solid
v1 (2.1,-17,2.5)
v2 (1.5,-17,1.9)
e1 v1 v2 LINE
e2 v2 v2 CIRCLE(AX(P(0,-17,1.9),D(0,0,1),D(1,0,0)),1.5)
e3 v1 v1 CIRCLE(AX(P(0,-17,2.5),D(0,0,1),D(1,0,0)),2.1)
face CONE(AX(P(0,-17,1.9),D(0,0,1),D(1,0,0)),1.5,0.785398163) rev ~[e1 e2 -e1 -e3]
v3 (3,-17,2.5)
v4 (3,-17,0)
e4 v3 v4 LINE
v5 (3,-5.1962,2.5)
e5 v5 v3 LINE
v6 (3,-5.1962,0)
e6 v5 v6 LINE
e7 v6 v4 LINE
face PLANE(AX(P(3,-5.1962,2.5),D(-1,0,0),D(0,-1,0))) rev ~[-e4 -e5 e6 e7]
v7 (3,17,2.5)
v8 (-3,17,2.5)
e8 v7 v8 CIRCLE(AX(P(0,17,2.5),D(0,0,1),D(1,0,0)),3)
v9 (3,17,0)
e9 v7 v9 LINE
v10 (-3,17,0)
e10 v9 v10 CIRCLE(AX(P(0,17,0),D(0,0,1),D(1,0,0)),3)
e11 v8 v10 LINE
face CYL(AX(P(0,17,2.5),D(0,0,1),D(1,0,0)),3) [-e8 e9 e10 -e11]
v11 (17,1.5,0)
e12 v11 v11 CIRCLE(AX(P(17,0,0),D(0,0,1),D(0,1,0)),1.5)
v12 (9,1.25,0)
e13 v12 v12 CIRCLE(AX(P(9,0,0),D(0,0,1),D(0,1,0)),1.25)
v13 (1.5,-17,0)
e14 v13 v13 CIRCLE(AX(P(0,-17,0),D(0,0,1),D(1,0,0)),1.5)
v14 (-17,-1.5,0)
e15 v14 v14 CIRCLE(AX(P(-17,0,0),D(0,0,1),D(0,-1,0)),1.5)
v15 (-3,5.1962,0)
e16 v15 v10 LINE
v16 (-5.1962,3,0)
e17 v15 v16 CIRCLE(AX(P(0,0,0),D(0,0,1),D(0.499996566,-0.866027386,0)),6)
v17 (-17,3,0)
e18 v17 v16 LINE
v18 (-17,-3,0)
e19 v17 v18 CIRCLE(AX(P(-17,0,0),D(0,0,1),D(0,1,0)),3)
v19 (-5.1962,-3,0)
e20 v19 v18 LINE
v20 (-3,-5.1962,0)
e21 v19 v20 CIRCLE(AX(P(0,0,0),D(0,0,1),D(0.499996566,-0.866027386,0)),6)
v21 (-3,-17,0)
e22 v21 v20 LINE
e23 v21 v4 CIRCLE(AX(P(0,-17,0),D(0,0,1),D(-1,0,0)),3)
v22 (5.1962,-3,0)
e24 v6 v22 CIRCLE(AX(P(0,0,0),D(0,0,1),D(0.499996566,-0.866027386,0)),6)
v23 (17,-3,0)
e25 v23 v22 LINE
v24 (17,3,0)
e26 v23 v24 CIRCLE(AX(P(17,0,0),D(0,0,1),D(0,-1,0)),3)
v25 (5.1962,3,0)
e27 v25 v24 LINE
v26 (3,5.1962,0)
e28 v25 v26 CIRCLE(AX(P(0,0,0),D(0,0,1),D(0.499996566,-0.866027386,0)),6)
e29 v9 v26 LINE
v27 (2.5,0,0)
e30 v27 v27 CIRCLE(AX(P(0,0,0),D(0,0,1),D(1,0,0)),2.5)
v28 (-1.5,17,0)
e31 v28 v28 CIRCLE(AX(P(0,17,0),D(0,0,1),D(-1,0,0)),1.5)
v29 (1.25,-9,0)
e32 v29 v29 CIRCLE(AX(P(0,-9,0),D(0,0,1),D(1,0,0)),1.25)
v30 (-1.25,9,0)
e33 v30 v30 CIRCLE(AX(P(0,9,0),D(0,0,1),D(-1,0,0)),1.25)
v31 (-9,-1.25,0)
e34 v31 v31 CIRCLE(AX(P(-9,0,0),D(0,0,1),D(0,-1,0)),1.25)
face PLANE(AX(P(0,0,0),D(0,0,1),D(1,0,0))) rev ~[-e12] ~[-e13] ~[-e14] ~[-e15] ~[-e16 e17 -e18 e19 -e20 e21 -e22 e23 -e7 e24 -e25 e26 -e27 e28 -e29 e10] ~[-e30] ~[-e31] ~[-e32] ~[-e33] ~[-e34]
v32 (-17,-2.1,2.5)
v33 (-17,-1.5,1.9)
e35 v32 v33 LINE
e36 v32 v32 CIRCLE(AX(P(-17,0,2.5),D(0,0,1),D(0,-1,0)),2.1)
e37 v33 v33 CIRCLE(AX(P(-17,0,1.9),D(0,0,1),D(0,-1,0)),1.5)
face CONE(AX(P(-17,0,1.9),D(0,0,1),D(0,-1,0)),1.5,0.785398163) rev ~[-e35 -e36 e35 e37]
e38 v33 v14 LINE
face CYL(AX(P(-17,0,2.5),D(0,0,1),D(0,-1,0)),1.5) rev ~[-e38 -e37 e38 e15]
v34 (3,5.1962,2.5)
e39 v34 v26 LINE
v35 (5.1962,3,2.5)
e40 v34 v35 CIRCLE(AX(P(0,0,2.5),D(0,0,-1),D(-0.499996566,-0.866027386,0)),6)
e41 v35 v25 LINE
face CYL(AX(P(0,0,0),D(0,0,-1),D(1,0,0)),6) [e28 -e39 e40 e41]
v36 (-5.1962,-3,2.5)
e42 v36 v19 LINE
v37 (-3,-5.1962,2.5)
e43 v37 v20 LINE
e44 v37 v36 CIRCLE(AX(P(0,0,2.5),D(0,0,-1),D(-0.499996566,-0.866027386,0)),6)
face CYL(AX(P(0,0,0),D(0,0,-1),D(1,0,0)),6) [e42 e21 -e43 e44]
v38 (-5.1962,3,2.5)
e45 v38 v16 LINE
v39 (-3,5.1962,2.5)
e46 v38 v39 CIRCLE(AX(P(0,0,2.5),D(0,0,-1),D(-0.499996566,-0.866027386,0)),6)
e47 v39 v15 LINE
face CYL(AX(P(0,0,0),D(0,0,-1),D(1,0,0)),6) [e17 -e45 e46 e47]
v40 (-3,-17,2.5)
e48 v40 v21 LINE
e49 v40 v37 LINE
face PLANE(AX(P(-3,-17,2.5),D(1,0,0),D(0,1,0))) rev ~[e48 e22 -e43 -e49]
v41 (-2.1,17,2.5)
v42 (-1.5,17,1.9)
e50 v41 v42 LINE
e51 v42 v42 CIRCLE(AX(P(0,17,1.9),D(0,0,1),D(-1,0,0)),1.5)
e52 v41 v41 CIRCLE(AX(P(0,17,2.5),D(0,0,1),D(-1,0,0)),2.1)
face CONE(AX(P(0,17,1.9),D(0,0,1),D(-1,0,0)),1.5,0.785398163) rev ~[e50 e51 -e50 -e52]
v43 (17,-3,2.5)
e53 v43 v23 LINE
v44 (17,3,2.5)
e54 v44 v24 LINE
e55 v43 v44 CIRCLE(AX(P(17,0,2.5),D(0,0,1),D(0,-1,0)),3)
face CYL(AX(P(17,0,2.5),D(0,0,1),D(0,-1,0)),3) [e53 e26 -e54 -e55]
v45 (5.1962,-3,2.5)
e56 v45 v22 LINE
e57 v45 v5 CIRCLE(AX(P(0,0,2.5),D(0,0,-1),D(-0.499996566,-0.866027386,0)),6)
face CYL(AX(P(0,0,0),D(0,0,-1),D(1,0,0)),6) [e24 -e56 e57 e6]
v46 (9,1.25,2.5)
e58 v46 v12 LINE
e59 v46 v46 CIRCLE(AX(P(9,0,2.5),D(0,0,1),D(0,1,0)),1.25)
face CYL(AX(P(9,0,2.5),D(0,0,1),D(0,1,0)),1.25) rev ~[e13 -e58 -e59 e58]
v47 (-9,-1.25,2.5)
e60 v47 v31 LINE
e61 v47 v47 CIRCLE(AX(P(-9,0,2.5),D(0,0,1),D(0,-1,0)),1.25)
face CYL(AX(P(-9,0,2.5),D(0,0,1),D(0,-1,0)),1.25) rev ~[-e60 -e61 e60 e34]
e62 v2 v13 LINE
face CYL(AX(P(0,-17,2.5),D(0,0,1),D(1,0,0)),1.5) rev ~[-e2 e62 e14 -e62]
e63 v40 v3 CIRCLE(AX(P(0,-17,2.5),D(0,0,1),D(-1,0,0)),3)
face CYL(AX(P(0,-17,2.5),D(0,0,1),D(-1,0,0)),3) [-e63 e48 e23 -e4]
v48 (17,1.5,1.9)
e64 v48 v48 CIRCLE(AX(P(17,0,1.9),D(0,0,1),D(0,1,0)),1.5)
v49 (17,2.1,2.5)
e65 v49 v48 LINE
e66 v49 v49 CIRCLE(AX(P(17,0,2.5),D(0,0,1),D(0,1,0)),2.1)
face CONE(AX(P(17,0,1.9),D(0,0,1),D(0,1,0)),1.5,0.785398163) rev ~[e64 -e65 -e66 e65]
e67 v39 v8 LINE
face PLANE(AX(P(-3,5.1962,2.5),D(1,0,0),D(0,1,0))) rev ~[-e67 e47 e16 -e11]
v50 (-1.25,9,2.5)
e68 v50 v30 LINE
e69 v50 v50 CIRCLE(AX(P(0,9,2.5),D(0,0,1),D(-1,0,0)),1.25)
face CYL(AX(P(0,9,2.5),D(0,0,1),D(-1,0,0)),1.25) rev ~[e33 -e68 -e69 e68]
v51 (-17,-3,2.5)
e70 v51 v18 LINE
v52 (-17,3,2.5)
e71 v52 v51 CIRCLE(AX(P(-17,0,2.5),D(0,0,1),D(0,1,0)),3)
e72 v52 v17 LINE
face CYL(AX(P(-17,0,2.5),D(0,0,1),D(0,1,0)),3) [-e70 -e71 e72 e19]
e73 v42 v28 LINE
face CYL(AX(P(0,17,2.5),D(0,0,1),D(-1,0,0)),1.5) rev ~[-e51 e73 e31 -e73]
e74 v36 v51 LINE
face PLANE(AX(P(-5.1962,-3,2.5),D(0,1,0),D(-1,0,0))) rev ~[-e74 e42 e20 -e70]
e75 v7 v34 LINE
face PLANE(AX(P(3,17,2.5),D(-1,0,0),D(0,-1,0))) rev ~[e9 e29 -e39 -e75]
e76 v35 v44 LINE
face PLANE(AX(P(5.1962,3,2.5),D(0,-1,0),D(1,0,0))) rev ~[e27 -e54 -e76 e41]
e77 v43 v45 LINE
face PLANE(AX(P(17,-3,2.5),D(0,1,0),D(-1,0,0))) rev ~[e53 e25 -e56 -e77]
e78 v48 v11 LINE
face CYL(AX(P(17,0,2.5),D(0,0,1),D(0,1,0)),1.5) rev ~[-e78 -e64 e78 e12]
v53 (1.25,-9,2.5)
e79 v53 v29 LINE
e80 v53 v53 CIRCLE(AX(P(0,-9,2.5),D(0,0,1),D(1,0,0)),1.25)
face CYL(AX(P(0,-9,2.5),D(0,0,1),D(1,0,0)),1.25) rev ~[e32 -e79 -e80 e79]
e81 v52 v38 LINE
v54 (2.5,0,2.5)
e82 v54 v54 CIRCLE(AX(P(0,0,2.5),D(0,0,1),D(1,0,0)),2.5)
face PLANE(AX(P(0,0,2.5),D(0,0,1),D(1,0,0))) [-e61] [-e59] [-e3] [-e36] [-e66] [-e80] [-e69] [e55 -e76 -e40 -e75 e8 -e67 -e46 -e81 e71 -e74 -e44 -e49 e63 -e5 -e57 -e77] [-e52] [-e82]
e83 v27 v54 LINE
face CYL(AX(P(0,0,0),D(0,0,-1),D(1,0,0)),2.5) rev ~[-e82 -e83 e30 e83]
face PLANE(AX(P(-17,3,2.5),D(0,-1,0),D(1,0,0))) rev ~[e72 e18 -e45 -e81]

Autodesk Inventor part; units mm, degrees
ref_plane "YZ Plane" through (0, 0, 0) normal (1, 0, 0) x (0, 1, 0)
ref_plane "XZ Plane" through (0, 0, 0) normal (0, 1, 0) x (-1, 0, 0)
ref_plane "XY Plane" through (0, 0, 0) normal (0, 0, 1) x (1, 0, 0)
sketch "Sketch2" plane through (0, 0, 0) normal (0, 0, 1) x (1, 0, 0)
  circle A0 centre (0, 0) radius 2.5
  circle A1 centre (0, 0) radius 6
  dimension "d12" = 5
  dimension "d13" = 12
extrude "Extrusion1" add sketch "Sketch2" along normal blind 2.5
sketch "Sketch3" plane through (0, 0, 2.5) normal (0, 0, 1) x (1, 0, 0)
  circle A0 centre (0, 0) radius 2.5 projected
  circle A1 centre (0, 0) radius 6 projected
  line L0 (0, 0) -> (0, -18.3723) construction
  circle A2 centre (0, -17) radius 1.5
  circle A3 centre (0, -9) radius 1.25
  line L1 (3, -5.1962) -> (3, -17)
  line L2 (-3, -17) -> (-3, -5.1962)
  line L3 (5.4814, -17) -> (-5.6867, -17) construction
  arc A4 (-3, -17) -> (3, -17) centre (0, -17) ccw
  dimension "d16" = 3
  dimension "d17" = 2.5
  dimension "d18" = 9
  dimension "d19" = 17
  dimension "d20" = 3
  dimension "d21" = 3
extrude "Extrusion2" add sketch "Sketch3" against normal blind 2.5 contours A1 L1 A4 L2
pattern_circular "Circular Pattern1" count 4 over 360 about axis through (0, 0, 0) along (0, 0, 1) of "Extrusion2"
chamfer "Chamfer1" distance 0.6 angle 45 4 edges at (-1.5, -17, 2.5) (17, -1.5, 2.5) (-17, 1.5, 2.5) (1.5, 17, 2.5)
equation "\"d21\" = d20"
properties part number "HK 2830 mounting plate"
